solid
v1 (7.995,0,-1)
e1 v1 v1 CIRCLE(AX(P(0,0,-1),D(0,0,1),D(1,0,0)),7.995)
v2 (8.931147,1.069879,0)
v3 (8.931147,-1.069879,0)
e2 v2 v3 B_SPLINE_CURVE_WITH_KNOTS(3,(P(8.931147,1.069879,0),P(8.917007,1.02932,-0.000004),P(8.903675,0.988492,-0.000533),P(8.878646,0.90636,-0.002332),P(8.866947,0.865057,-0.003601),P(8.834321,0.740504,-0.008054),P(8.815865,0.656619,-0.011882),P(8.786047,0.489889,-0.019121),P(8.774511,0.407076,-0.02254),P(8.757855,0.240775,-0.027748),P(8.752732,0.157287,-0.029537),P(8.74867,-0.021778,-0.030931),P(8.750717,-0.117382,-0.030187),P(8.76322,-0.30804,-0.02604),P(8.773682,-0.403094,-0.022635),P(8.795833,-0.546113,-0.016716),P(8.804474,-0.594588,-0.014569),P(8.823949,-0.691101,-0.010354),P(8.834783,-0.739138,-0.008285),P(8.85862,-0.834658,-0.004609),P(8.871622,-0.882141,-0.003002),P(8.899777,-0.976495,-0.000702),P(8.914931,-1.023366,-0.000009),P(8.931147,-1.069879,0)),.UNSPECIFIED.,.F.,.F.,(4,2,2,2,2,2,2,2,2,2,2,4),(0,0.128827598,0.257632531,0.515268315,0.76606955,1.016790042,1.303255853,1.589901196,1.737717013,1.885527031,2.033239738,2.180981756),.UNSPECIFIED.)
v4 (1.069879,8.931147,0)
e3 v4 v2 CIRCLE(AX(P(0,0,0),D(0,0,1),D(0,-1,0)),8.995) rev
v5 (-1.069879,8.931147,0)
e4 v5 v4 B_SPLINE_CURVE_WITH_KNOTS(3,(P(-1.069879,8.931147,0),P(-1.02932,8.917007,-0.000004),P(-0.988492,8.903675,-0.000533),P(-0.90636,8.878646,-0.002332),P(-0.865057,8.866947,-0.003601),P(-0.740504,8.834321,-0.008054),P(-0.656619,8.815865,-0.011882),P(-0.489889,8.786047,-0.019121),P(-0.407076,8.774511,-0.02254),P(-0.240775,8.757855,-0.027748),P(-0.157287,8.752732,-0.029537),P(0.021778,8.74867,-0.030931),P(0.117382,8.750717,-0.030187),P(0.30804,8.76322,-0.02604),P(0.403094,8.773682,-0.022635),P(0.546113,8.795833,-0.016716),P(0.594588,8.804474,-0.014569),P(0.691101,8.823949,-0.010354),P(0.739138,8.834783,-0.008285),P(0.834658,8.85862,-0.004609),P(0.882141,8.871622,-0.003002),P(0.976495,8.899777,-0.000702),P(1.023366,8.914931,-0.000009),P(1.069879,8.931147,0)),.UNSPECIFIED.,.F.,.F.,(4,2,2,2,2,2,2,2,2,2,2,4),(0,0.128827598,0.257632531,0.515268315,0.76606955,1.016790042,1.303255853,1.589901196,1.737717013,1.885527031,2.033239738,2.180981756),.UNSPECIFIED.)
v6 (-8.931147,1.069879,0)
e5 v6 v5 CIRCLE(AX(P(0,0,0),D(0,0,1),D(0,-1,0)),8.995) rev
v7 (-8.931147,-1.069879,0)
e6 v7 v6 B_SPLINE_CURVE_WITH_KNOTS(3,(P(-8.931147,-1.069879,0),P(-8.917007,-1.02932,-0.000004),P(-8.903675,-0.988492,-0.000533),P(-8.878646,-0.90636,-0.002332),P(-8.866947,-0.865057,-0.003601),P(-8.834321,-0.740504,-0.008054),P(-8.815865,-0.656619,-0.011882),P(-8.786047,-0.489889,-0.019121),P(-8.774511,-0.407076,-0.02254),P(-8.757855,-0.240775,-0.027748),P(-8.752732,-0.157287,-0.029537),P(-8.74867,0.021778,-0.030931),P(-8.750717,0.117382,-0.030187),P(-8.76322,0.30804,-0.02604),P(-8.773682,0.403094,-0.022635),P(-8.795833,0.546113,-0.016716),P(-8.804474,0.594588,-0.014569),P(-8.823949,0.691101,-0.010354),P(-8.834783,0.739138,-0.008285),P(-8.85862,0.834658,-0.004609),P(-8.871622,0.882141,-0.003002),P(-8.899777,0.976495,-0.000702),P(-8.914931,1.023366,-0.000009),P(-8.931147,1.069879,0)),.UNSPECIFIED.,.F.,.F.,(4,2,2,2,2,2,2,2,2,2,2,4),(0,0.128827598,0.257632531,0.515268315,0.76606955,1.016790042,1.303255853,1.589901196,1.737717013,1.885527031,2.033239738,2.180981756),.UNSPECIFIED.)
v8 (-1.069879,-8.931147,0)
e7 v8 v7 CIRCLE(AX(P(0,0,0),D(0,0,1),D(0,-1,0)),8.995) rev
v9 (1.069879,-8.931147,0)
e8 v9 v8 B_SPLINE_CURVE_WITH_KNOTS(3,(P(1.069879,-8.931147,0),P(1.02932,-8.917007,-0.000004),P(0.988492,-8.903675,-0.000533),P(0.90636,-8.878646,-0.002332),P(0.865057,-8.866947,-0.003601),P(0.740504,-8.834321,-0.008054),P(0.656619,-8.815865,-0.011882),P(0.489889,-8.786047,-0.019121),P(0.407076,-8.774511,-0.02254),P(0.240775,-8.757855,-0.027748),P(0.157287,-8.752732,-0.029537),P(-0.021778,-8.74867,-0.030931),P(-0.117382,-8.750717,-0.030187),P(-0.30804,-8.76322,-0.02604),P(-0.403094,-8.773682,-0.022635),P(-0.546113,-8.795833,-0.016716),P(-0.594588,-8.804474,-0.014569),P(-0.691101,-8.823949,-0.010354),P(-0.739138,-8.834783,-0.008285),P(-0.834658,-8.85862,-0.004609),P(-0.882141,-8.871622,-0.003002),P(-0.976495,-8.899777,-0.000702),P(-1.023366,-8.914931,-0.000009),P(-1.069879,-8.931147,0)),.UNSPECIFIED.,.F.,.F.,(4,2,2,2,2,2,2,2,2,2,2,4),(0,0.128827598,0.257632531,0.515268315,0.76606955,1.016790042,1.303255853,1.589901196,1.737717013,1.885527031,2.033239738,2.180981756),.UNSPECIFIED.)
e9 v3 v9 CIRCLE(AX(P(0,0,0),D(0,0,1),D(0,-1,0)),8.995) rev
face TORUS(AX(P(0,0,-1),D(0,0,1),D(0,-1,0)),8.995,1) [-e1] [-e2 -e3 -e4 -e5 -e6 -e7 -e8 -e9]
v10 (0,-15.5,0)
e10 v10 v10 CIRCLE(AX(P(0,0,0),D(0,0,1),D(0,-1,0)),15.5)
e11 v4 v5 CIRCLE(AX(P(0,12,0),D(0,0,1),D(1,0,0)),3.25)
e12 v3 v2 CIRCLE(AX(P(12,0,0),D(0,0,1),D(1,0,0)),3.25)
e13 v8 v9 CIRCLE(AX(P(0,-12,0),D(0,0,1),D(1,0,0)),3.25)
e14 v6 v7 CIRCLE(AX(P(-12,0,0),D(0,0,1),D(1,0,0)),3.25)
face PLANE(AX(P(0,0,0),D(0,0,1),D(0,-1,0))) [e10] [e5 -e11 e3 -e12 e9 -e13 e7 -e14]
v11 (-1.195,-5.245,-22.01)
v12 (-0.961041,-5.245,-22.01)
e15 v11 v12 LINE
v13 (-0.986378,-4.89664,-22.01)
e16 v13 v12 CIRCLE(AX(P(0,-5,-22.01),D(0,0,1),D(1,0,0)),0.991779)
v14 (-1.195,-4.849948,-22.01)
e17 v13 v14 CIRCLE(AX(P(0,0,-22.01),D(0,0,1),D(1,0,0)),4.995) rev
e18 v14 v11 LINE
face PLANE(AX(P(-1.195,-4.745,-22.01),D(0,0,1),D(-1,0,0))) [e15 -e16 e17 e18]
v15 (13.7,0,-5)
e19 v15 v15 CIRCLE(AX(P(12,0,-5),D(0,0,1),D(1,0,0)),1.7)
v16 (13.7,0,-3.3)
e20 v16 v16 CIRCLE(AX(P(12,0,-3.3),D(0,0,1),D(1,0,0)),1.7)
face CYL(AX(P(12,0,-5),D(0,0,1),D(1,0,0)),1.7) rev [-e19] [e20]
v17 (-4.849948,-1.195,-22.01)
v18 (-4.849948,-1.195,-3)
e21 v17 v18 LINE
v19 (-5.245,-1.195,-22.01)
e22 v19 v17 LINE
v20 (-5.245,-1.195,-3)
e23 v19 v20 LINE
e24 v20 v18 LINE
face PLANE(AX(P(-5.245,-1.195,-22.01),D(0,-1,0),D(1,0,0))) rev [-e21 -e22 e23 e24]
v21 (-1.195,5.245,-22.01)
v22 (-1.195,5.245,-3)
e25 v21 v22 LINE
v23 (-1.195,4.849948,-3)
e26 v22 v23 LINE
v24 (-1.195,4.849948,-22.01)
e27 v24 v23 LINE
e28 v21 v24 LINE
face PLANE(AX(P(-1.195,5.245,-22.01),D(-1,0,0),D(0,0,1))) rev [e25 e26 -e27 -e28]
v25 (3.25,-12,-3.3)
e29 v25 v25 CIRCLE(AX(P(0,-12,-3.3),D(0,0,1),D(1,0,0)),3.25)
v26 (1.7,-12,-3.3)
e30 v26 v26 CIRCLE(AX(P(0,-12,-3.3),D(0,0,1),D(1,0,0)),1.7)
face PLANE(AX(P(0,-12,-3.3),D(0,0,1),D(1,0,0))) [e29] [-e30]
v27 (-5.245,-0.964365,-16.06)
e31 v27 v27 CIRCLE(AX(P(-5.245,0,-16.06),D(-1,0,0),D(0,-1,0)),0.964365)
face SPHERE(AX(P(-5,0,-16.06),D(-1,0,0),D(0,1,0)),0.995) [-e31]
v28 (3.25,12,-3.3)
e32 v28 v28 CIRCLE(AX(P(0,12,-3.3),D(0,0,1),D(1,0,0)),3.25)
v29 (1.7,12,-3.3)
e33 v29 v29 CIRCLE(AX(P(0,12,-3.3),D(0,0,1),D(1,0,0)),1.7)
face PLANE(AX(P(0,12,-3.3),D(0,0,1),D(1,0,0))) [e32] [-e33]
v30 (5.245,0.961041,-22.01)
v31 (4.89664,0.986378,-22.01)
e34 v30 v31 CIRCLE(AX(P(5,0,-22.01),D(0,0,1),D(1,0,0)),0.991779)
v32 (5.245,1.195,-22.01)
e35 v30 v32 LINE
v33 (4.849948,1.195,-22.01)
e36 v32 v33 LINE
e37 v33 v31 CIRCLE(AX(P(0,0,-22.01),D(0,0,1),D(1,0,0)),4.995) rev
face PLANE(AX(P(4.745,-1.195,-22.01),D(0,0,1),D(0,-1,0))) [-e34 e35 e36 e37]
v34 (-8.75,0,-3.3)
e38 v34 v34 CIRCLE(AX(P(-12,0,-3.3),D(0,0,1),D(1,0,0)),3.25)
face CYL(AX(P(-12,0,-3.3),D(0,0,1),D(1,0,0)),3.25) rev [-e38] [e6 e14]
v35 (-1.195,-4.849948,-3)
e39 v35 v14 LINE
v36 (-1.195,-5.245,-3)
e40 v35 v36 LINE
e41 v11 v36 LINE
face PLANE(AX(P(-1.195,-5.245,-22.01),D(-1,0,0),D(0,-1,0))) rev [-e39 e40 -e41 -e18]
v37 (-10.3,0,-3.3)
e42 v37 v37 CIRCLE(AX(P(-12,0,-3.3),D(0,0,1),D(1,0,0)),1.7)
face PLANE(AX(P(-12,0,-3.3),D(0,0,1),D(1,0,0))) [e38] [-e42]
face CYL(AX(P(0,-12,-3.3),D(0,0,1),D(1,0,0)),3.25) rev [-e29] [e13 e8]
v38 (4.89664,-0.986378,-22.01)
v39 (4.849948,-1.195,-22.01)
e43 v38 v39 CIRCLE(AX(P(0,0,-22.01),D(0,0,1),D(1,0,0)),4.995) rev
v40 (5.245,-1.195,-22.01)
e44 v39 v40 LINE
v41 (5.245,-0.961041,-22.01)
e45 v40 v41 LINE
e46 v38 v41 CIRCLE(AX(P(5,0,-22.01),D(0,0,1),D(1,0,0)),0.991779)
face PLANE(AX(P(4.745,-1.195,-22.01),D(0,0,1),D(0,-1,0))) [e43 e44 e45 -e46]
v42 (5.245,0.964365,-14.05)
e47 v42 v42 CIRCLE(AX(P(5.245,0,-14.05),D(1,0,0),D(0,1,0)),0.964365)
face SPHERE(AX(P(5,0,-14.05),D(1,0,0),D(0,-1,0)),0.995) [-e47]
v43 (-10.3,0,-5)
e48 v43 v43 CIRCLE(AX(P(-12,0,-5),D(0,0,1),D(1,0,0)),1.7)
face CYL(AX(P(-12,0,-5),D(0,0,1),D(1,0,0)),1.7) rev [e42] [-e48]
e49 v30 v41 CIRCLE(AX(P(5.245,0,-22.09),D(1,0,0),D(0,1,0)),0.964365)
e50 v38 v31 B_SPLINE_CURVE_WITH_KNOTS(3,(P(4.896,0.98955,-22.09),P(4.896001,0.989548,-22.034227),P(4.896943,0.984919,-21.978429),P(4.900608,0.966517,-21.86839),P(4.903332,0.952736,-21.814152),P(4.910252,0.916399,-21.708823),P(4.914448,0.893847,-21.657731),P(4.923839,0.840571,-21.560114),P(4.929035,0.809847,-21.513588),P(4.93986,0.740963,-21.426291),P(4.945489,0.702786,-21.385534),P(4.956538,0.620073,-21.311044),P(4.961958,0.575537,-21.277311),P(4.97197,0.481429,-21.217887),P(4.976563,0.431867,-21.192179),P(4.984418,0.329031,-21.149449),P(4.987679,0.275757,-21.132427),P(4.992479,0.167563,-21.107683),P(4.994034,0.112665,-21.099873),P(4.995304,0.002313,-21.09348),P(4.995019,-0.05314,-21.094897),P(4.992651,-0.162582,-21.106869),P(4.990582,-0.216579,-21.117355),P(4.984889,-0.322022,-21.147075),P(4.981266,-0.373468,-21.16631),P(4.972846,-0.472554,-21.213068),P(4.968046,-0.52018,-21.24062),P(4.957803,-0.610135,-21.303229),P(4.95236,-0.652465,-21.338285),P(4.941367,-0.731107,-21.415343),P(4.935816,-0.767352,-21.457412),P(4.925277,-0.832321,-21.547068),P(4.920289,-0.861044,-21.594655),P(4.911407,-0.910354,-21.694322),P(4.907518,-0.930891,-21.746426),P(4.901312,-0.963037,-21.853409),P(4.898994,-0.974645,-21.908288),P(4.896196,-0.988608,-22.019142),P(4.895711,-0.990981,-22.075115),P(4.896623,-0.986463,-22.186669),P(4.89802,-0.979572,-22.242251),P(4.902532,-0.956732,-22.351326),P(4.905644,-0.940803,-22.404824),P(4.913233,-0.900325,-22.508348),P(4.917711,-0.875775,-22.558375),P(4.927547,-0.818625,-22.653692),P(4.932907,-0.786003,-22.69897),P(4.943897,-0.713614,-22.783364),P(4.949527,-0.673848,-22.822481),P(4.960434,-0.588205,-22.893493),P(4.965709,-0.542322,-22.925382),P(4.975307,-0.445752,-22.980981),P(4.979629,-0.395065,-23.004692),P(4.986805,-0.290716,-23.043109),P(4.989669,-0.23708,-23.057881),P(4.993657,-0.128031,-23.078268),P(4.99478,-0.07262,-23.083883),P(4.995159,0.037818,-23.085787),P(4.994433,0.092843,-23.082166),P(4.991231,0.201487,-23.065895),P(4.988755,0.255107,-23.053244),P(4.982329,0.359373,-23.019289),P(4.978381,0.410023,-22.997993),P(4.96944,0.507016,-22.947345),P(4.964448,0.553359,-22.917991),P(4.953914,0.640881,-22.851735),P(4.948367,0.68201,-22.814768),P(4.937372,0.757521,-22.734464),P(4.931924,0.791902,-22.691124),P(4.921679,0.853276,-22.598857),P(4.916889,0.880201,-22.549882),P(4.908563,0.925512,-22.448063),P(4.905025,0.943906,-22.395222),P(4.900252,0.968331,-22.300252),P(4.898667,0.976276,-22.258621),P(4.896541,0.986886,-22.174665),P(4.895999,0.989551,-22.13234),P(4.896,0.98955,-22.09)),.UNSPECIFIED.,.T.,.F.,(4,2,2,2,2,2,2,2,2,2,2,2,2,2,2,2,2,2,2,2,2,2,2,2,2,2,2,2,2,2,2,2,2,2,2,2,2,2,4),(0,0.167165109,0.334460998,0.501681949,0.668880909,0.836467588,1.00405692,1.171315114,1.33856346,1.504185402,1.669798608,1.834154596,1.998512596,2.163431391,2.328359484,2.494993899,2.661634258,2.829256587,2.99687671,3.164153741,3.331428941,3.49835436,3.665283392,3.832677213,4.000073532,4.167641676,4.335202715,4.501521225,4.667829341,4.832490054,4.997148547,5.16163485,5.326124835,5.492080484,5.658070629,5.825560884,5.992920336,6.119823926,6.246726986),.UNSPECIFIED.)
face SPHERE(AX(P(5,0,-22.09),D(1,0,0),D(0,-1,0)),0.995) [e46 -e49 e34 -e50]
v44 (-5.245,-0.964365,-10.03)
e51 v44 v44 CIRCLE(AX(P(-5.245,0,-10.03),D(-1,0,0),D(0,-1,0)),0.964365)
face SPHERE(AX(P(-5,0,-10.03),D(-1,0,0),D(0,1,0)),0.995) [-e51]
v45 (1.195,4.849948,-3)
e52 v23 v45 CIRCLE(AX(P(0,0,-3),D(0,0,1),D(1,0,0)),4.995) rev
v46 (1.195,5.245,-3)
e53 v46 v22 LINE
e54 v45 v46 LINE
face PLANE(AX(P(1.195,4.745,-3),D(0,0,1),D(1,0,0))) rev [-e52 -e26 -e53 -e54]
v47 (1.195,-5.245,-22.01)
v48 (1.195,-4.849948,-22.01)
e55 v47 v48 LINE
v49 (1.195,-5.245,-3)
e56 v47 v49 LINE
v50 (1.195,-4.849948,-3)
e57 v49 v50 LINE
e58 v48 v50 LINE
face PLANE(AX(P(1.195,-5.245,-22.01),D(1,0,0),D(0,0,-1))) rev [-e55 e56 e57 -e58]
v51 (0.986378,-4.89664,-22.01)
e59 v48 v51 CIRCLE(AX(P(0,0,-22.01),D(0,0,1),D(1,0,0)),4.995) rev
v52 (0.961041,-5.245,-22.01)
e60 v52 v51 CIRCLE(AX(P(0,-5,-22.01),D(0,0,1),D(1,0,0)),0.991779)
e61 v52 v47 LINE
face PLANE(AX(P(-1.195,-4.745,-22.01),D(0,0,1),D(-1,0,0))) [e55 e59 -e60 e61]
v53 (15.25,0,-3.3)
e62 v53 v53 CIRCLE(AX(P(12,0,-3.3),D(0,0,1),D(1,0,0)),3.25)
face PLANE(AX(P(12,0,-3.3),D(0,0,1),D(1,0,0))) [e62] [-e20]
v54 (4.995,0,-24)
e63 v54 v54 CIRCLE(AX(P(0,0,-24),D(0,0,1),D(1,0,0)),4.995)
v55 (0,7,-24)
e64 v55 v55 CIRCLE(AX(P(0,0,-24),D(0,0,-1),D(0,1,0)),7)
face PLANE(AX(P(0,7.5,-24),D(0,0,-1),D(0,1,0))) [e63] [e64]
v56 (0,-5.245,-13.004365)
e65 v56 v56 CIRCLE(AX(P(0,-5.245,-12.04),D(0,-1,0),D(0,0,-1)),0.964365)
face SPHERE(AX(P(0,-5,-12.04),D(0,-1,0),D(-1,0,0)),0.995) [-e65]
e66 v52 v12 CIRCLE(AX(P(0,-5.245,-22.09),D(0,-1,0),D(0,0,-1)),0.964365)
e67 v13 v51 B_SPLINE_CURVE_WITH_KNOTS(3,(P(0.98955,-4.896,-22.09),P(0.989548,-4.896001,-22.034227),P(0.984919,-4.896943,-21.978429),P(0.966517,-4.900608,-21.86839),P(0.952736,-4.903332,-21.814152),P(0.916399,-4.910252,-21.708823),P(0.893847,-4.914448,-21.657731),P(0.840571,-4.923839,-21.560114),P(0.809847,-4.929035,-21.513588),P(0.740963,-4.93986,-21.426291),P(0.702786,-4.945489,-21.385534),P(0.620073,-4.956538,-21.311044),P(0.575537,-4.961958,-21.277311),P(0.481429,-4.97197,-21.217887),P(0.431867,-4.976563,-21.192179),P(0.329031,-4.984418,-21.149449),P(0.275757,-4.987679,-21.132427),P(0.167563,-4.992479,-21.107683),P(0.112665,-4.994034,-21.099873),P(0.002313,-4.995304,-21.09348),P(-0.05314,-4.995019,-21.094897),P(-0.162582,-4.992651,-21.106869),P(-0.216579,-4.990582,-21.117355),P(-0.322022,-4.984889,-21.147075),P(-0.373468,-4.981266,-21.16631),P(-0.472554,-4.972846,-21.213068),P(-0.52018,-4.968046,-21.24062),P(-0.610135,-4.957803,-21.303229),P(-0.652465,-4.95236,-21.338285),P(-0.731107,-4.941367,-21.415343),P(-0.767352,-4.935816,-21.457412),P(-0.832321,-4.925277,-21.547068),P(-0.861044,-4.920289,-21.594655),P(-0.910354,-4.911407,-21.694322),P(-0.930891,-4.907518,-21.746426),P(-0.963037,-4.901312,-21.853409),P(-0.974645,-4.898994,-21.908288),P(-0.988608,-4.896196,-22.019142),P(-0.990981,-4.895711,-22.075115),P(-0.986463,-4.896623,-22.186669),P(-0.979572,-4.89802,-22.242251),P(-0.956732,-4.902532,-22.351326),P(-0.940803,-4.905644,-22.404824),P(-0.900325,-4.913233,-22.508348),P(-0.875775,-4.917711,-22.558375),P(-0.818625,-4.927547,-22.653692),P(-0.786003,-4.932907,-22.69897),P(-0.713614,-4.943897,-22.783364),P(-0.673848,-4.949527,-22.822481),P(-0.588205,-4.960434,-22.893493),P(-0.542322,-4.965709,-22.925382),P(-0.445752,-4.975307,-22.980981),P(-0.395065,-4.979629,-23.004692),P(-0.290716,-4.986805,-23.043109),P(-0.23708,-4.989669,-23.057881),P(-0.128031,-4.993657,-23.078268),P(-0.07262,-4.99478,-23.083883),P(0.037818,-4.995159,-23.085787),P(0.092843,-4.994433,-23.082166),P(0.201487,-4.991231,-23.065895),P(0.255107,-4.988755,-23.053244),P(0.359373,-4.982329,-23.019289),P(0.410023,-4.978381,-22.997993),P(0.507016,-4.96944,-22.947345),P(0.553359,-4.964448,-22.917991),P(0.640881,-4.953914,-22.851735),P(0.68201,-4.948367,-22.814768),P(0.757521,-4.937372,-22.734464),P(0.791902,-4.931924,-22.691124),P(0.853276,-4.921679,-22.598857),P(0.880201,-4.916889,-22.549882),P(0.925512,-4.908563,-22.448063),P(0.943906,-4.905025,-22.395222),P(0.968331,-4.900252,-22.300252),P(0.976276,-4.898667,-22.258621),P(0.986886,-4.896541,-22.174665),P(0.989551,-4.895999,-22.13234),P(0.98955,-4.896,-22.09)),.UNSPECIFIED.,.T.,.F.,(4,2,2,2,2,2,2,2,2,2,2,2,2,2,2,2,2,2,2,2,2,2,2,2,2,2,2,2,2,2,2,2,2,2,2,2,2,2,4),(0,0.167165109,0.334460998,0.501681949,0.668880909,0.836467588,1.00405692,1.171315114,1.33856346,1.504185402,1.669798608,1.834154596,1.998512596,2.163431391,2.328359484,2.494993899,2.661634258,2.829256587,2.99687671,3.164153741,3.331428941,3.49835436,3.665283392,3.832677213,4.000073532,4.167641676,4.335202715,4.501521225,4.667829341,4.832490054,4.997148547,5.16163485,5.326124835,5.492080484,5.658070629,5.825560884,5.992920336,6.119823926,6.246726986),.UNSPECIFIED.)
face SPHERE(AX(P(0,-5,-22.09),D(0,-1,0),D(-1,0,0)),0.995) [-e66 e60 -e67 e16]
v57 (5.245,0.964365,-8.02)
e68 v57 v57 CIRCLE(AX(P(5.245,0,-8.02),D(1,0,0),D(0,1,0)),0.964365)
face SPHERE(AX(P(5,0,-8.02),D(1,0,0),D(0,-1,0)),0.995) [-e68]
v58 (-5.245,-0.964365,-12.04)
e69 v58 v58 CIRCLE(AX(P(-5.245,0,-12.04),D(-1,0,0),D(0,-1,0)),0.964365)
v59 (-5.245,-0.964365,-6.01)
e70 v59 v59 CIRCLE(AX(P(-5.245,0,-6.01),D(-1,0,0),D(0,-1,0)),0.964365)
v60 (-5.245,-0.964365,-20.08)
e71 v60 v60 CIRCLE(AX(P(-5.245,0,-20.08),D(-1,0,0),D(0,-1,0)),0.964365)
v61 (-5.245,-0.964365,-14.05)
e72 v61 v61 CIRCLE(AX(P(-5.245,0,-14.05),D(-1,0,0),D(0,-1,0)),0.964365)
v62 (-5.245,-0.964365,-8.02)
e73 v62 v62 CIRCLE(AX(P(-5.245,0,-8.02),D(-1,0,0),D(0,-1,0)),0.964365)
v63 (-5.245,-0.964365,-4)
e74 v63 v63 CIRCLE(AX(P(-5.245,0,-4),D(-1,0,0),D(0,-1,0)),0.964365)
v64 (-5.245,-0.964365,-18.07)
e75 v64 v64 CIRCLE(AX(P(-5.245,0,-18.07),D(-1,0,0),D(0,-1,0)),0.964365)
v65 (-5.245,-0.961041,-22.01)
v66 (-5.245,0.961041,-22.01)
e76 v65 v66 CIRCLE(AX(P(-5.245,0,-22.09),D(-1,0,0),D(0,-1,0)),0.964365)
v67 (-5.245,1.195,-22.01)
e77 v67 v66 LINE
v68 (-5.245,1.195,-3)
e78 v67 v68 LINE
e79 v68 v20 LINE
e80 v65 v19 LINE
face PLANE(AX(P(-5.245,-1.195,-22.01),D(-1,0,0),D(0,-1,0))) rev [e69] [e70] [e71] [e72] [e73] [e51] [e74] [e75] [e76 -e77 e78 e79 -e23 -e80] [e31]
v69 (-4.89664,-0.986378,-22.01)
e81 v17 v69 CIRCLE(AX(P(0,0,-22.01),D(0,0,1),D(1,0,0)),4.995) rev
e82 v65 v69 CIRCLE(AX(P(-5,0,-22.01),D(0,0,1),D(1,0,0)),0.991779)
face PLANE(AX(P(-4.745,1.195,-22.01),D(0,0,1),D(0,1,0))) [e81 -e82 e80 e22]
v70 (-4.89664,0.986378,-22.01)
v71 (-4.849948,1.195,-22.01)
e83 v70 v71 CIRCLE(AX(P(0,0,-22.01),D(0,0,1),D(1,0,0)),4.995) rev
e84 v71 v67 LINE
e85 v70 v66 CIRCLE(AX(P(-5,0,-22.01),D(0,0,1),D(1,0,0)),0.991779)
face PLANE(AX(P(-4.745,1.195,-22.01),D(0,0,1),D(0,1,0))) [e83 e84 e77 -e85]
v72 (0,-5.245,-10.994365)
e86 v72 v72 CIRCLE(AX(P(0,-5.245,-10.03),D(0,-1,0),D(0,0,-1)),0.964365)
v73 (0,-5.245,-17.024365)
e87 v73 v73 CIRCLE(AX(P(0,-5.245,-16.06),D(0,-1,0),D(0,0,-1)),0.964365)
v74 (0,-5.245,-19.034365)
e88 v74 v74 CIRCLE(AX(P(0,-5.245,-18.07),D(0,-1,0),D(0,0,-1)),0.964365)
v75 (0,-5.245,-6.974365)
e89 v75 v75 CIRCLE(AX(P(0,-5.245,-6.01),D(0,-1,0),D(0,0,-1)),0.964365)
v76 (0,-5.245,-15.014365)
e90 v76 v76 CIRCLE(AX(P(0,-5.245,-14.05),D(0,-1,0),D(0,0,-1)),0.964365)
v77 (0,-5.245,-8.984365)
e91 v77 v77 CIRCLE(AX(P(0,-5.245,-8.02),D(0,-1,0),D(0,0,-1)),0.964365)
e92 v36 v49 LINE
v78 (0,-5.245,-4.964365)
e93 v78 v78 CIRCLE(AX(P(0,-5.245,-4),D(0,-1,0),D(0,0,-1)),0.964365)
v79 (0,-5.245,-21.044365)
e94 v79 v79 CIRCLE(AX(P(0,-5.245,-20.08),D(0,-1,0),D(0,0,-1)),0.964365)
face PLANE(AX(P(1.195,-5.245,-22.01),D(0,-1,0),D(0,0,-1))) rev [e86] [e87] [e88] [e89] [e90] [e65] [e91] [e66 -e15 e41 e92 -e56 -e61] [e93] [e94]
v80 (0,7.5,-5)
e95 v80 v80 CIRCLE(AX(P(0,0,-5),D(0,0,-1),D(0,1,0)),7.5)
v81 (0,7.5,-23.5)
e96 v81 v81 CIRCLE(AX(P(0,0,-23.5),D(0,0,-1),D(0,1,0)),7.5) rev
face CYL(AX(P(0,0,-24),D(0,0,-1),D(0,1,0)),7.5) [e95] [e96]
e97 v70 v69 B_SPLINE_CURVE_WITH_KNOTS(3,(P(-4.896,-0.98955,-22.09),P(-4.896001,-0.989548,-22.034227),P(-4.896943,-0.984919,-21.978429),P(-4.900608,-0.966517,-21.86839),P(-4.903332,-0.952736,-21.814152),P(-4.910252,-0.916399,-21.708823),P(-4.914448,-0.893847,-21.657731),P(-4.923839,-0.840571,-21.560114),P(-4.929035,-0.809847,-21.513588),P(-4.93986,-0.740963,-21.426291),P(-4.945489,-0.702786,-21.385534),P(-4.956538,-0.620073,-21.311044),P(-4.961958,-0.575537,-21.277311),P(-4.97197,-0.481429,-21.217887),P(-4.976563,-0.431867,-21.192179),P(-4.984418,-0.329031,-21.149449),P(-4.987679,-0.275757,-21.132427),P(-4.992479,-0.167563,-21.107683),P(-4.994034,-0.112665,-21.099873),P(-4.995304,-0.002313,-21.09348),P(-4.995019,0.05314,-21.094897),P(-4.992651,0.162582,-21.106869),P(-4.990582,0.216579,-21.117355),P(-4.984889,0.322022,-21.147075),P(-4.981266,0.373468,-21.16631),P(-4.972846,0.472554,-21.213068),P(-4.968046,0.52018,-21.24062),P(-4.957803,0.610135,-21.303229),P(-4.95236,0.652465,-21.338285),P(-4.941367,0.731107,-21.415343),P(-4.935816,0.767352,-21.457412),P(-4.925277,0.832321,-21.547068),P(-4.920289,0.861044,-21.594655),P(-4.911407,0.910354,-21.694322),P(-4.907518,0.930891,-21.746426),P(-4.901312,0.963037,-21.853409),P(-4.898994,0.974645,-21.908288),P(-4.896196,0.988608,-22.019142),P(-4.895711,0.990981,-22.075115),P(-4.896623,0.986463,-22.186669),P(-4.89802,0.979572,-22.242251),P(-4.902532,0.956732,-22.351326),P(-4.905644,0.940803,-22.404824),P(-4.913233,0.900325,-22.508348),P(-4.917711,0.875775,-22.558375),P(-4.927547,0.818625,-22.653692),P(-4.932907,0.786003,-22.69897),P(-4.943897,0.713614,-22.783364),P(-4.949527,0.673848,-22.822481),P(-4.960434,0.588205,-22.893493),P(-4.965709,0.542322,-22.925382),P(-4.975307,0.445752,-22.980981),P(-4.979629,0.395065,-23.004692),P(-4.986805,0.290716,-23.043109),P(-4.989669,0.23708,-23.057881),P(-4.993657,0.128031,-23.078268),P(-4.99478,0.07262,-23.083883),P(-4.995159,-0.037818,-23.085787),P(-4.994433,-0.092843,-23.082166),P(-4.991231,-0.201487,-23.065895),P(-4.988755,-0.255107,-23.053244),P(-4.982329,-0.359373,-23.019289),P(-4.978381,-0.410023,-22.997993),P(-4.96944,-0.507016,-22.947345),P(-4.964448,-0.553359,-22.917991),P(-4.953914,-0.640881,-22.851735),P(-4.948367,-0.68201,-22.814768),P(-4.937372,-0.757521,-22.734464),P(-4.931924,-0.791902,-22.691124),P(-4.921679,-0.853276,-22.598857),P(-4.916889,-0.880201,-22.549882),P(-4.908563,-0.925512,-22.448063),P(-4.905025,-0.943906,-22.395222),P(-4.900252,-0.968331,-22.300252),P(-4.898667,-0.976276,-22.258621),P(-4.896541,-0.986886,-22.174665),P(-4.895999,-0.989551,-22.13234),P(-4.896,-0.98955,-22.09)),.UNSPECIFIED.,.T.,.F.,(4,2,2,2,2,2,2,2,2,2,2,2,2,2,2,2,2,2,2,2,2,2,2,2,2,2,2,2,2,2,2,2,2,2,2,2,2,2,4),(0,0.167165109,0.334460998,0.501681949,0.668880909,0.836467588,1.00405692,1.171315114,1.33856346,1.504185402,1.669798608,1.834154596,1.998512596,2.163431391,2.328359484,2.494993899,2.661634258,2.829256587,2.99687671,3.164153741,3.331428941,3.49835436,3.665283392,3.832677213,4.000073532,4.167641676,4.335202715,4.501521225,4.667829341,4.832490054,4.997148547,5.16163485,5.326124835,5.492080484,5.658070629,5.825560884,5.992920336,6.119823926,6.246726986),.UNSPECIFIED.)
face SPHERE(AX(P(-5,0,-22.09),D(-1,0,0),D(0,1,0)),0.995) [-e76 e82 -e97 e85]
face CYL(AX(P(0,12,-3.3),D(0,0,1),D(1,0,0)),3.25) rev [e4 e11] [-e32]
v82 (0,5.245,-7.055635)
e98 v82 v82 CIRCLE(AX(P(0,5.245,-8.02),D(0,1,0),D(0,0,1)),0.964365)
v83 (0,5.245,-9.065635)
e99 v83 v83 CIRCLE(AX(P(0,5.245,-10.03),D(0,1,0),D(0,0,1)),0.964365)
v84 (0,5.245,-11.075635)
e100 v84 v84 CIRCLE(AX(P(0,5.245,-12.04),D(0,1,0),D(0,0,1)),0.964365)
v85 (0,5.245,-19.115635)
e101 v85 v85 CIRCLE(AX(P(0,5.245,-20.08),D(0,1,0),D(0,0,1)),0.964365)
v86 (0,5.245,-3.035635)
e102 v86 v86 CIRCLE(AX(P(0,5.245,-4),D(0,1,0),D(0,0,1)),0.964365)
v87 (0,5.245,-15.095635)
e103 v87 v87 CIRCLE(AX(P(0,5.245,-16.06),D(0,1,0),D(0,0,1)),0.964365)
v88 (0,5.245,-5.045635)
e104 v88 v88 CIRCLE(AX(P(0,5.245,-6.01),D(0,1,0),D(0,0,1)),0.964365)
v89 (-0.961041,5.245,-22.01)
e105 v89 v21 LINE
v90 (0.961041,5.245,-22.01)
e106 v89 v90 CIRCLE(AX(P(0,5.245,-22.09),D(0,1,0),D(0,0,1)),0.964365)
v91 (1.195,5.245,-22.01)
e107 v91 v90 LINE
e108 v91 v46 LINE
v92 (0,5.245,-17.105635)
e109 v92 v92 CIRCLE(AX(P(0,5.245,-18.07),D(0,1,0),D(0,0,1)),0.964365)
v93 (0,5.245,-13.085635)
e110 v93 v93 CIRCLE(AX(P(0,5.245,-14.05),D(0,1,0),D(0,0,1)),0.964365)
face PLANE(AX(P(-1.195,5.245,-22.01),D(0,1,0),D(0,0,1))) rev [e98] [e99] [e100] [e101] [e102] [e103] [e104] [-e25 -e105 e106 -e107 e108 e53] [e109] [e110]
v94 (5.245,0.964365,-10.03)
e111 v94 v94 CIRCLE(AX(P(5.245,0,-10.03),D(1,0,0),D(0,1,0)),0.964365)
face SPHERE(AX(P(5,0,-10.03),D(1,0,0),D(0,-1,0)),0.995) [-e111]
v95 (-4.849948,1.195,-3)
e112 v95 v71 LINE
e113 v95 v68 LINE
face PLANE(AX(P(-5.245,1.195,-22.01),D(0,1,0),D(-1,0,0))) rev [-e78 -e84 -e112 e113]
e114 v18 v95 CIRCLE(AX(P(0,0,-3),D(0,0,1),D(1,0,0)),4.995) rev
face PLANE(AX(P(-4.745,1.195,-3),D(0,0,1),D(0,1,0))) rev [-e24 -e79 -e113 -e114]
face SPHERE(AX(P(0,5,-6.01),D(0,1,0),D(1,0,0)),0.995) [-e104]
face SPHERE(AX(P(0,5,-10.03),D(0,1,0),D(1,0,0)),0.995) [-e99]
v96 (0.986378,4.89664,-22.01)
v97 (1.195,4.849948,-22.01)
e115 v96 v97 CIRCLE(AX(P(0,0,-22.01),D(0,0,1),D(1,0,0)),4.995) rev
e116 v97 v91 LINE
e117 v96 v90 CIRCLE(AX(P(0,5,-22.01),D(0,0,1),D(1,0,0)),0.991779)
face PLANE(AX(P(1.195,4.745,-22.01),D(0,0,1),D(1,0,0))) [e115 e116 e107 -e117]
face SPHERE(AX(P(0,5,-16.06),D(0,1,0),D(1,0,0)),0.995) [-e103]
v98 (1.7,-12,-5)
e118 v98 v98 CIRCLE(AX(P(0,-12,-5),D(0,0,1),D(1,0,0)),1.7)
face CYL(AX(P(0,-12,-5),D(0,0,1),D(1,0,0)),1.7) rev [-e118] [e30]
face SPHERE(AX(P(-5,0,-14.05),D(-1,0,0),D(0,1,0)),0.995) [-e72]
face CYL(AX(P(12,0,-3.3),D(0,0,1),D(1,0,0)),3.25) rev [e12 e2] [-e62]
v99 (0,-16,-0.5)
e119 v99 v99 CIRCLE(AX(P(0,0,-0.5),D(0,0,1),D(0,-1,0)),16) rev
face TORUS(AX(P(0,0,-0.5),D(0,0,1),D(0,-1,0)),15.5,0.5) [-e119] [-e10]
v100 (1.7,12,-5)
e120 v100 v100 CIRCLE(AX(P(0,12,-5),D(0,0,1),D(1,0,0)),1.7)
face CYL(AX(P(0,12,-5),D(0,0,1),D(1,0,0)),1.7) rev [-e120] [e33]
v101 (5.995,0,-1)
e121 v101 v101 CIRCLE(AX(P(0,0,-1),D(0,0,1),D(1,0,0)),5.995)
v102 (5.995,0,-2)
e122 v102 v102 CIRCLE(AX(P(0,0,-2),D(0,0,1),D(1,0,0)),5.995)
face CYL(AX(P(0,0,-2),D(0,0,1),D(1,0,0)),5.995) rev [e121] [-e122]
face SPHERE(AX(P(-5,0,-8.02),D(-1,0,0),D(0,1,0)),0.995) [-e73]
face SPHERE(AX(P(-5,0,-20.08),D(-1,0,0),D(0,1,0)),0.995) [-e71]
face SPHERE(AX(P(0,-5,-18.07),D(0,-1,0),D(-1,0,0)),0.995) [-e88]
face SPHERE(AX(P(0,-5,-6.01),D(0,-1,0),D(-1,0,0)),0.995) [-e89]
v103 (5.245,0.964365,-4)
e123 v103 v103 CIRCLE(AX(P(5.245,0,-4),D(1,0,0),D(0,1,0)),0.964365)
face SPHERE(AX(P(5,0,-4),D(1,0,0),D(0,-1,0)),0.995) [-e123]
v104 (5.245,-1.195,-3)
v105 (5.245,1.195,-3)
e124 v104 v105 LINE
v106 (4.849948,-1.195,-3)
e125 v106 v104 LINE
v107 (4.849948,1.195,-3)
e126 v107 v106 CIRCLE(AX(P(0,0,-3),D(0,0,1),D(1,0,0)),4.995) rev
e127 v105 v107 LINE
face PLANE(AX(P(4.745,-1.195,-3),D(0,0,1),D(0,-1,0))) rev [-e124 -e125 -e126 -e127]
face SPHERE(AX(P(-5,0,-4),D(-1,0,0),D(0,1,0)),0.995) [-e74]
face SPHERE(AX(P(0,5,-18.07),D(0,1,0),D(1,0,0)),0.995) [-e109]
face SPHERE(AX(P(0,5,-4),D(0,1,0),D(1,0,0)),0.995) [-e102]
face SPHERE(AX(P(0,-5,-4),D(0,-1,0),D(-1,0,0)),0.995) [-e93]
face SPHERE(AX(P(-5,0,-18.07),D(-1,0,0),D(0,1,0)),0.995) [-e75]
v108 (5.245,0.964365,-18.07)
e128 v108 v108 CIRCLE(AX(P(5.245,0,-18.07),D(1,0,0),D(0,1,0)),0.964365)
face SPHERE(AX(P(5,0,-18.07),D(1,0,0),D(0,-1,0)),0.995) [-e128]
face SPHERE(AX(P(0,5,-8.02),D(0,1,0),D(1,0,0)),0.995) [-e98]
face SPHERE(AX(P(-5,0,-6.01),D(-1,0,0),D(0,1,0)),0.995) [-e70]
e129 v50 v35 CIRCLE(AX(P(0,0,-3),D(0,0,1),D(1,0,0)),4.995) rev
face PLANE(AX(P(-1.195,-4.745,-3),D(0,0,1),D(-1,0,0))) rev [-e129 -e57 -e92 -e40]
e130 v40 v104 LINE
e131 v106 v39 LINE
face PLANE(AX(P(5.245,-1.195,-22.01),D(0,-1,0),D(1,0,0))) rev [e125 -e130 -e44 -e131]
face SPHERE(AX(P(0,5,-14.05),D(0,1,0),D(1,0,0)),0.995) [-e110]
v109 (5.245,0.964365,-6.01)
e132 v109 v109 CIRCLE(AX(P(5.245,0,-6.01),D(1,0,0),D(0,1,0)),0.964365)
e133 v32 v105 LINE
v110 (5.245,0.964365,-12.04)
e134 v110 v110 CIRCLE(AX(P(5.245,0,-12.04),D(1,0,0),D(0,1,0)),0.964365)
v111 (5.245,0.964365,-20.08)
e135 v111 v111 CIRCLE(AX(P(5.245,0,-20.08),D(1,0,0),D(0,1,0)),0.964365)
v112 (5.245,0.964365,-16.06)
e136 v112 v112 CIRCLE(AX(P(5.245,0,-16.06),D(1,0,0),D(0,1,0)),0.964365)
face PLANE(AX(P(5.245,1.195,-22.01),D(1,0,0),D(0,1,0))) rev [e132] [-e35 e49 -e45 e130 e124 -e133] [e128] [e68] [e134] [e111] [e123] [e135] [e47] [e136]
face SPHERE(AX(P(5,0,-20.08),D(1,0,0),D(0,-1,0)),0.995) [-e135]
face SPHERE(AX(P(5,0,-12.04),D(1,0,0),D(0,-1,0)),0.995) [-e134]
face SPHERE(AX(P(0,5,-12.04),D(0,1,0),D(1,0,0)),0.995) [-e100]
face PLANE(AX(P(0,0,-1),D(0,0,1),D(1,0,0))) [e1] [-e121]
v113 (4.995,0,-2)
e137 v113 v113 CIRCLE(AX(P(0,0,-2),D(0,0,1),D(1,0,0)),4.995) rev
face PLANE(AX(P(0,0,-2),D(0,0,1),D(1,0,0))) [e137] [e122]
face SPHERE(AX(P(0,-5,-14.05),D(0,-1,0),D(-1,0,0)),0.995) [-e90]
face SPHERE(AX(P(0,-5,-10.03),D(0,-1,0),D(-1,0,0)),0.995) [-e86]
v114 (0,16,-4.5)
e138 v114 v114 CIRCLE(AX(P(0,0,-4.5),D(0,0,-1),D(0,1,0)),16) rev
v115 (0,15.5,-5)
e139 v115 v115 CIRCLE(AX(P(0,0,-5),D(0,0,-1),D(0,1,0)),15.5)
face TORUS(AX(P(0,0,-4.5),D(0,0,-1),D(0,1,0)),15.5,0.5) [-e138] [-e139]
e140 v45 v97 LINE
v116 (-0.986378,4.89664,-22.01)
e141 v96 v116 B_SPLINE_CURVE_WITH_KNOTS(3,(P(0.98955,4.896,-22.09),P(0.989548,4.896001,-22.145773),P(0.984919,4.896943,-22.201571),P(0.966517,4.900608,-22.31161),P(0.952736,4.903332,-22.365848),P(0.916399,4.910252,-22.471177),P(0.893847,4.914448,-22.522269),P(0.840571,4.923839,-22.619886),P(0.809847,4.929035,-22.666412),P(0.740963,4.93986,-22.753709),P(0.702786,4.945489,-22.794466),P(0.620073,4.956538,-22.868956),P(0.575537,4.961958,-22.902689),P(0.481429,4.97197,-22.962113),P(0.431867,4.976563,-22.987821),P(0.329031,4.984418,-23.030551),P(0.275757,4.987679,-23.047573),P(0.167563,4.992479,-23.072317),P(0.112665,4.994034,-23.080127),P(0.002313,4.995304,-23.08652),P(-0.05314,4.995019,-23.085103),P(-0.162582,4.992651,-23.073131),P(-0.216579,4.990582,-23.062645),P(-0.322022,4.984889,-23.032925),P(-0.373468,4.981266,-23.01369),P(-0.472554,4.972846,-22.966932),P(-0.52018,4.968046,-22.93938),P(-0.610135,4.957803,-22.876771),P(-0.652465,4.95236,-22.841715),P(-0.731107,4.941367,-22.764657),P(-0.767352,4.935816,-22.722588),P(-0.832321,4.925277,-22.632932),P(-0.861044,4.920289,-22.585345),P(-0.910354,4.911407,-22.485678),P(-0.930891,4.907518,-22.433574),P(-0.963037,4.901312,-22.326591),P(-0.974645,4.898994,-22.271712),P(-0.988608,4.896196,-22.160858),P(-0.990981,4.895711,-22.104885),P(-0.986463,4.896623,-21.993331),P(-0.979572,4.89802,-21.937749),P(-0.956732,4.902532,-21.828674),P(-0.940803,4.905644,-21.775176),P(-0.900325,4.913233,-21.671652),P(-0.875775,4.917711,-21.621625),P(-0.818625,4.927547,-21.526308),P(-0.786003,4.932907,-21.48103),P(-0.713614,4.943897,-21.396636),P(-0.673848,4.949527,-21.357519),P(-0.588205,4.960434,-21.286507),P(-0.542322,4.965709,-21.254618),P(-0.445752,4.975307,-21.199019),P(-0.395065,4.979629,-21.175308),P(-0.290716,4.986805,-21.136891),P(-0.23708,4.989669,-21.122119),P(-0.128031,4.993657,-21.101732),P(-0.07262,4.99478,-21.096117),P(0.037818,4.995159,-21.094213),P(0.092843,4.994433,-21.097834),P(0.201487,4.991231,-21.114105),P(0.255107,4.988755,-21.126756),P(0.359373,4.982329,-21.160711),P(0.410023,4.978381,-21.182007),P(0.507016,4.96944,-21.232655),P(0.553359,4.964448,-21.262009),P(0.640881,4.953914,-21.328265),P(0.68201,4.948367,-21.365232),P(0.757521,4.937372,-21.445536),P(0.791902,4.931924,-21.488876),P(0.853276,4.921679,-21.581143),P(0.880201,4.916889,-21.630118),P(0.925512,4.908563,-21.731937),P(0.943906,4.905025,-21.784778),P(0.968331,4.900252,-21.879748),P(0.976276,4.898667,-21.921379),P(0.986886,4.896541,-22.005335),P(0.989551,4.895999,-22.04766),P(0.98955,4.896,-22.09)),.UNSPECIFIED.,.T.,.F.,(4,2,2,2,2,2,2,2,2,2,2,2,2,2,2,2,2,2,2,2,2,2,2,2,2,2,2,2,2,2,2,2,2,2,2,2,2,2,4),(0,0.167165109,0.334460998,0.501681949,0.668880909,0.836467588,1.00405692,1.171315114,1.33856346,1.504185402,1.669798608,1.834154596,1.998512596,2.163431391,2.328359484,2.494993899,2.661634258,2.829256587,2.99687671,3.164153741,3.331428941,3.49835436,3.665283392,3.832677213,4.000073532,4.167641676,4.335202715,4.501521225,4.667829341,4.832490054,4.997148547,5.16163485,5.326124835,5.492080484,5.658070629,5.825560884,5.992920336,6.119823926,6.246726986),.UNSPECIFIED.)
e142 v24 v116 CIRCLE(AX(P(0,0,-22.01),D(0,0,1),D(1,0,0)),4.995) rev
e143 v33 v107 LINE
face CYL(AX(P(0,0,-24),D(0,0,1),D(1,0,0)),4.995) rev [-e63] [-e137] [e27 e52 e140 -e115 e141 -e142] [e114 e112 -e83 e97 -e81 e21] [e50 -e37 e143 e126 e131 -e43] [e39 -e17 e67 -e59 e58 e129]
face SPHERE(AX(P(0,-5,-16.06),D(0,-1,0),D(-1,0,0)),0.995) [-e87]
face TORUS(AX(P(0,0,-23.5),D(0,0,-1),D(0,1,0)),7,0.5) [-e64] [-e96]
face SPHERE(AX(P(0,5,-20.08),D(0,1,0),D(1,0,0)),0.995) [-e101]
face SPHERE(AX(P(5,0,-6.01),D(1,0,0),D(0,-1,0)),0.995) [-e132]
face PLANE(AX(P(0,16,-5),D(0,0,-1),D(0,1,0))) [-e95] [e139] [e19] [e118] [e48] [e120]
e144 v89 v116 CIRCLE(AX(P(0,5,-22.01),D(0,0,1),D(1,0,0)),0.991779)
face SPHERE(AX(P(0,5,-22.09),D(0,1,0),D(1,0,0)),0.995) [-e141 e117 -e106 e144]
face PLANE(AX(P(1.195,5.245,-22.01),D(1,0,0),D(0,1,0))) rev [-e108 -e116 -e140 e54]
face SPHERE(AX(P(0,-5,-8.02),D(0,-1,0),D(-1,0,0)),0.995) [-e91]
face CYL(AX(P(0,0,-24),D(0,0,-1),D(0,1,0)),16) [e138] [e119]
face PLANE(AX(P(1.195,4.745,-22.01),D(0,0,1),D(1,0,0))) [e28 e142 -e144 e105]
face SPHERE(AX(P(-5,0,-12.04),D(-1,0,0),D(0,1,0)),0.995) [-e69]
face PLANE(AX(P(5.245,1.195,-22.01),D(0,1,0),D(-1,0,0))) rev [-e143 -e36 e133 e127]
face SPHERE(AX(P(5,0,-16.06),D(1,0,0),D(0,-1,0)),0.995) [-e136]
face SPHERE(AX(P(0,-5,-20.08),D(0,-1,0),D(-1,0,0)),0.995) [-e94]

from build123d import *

# Parameters (mm, degrees)
REVOLVE_START            = -24
REVOLVE_1_OUTLINE_R      = 7.5
REVOLVE_1_DEPTH          = 24
REVOLVE_START_2          = -5
REVOLVE_1_2_OUTLINE_R    = 16
REVOLVE_1_2_OUTLINE_R_2  = 7.5
REVOLVE_1_2_DEPTH        = 5
SKETCH_16_R              = 3.25
CUT_EXTRUDE_11_DEPTH     = 3.3
SKETCH_17_R              = 1.7
CUT_EXTRUDE_12_DEPTH     = 5
SKETCH_4_R               = 4.995
CUT_EXTRUDE_1_DEPTH      = 24
SKETCH_5_R               = 7.995
CUT_EXTRUDE_2_DEPTH      = 1
SKETCH_6_R               = 5.995
CUT_EXTRUDE_3_DEPTH      = 1
FILLET_1_R               = 0.5
FILLET_2_R               = 1
SKETCH_8_W               = 2.39
SKETCH_8_H               = 0.5
CUT_EXTRUDE_4_DEPTH      = 19.01
PATTERN_LINEAR_2_COUNT   = 10
PATTERN_LINEAR_2_PITCH   = 2.01
PATTERN_CIRCULAR_2_COUNT = 4


# Read off the part's stored shape, not the designer's step: 旋转1, 旋转2
with BuildPart() as part:
    # 旋转1 outline → 旋转1 (new body)
    with BuildSketch(Plane.XY.offset(REVOLVE_START)):
        Circle(REVOLVE_1_OUTLINE_R)
    extrude(amount=REVOLVE_1_DEPTH)

    # Revolve 1 2 outline → Revolve 1 2 (add)
    with BuildSketch(Plane.XY.offset(REVOLVE_START_2)):
        Circle(REVOLVE_1_2_OUTLINE_R)
        Circle(REVOLVE_1_2_OUTLINE_R_2, mode=Mode.SUBTRACT)
    extrude(amount=REVOLVE_1_2_DEPTH)

    # 草图16 → 切除-拉伸11 (cut)
    with BuildSketch(Plane.XY):
        with Locations((0, 12)):
            Circle(SKETCH_16_R)
        with Locations((12, 0)):
            Circle(SKETCH_16_R)
        with Locations((-12, 0)):
            Circle(SKETCH_16_R)
        with Locations((0, -12)):
            Circle(SKETCH_16_R)
    extrude(amount=-CUT_EXTRUDE_11_DEPTH, mode=Mode.SUBTRACT)

    # 草图17 → 切除-拉伸12 (cut)
    with BuildSketch(Plane.XY):
        with Locations((12, 0)):
            Circle(SKETCH_17_R)
        with Locations((0, -12)):
            Circle(SKETCH_17_R)
        with Locations((-12, 0)):
            Circle(SKETCH_17_R)
        with Locations((0, 12)):
            Circle(SKETCH_17_R)
    extrude(amount=-CUT_EXTRUDE_12_DEPTH, mode=Mode.SUBTRACT)

    # 草图4 → 切除-拉伸1 (cut)
    with BuildSketch(Plane.XY):
        Circle(SKETCH_4_R)
    extrude(amount=-CUT_EXTRUDE_1_DEPTH, mode=Mode.SUBTRACT)

    # 草图5 → 切除-拉伸2 (cut)
    with BuildSketch(Plane.XY):
        Circle(SKETCH_5_R)
    extrude(amount=-CUT_EXTRUDE_2_DEPTH, mode=Mode.SUBTRACT)

    # 草图6 → 切除-拉伸3 (cut)
    with BuildSketch(Plane.XY.offset(-1)):
        Circle(SKETCH_6_R)
    extrude(amount=-CUT_EXTRUDE_3_DEPTH, mode=Mode.SUBTRACT)

    # 圆角1
    fillet_1_edges = [part.edges().sort_by_distance(p)[0] for p in [
        (-7.5, 0, -24),
        (-16, 0, -5),
        (-16, 0, 0),
    ]]
    fillet(fillet_1_edges, radius=FILLET_1_R)

    # 圆角2
    # the kernel refuses this fillet: 1 mm, written as the material it takes off along each edge
    with BuildSketch(Plane(origin=(0, 0, 0), x_dir=(1, 0, 0), z_dir=(0, -1, 0))) as fillet_2_piece_1:
        with BuildLine():
            CenterArc((7.995 + FILLET_2_R, -FILLET_2_R), FILLET_2_R, 90, 90)
            Line((7.995, -FILLET_2_R), (7.995, 0))
            Line((7.995, 0), (7.995 + FILLET_2_R, 0))
        make_face()
    revolve(axis=Axis((0, 0, 0), (0, 0, 1)), mode=Mode.SUBTRACT)

    # 草图8 → 切除-拉伸4 (cut)
    with BuildSketch(Plane.XY.offset(-3)):
        with Locations((0, 4.995)):
            Rectangle(SKETCH_8_W, SKETCH_8_H)
    cut_extrude_4 = extrude(amount=-CUT_EXTRUDE_4_DEPTH, mode=Mode.SUBTRACT)

    # 旋转2 outline → 旋转2 (revolve)
    with BuildSketch(Plane.XY.offset(-4)):
        with BuildLine():
            Line((0, 5.245000001), (0, 4.005))
            ThreePointArc((0, 4.005), (0.785429819, 4.389160414), (0.964365076, 5.245000001))
            Line((0.964365076, 5.245000001), (0, 5.245000001))
        make_face()
    revolve_2 = revolve(axis=Axis((0, 0, -4), (0, 1, 0)))

    # 阵列(线性)2: 旋转2 ×10
    with Locations(*[(0, 0, -i * PATTERN_LINEAR_2_PITCH) for i in range(1, PATTERN_LINEAR_2_COUNT)]):
        add(revolve_2)

    # 阵列(圆周)2: 切除-拉伸4, 旋转2 ×4 about axis
    pattern_circular_2_axis = Axis((0, 0, 0), (0, 0, 1))
    add([cut_extrude_4.rotate(pattern_circular_2_axis, i * 360 / PATTERN_CIRCULAR_2_COUNT) for i in range(1, PATTERN_CIRCULAR_2_COUNT)], mode=Mode.SUBTRACT)
    add([revolve_2.rotate(pattern_circular_2_axis, i * 360 / PATTERN_CIRCULAR_2_COUNT) for i in range(1, PATTERN_CIRCULAR_2_COUNT)])

    # 阵列(圆周)2 copy 1 sketch → 阵列(圆周)2 copy 1 (revolve)
    with BuildSketch(Plane(origin=(0, 0, -6.01), x_dir=(0, 1, 0), z_dir=(0, 0, 1))):
        with BuildLine():
            Line((0, 5.245000001), (0, 4.005))
            ThreePointArc((0, 4.005), (0.785429819, 4.389160414), (0.964365076, 5.245000001))
            Line((0.964365076, 5.245000001), (0, 5.245000001))
        make_face()
    revolve(axis=Axis((0, 0, -6.01), (-1, 0, 0)))

    # 阵列(圆周)2 copy 2 sketch → 阵列(圆周)2 copy 2 (revolve)
    with BuildSketch(Plane(origin=(0, 0, -6.01), x_dir=(-1, 0, 0), z_dir=(0, 0, 1))):
        with BuildLine():
            Line((0, 5.245000001), (0, 4.005))
            ThreePointArc((0, 4.005), (0.785429819, 4.389160414), (0.964365076, 5.245000001))
            Line((0.964365076, 5.245000001), (0, 5.245000001))
        make_face()
    revolve(axis=Axis((0, 0, -6.01), (0, -1, 0)))

    # 阵列(圆周)2 copy 3 sketch → 阵列(圆周)2 copy 3 (revolve)
    with BuildSketch(Plane(origin=(0, 0, -6.01), x_dir=(0, -1, 0), z_dir=(0, 0, 1))):
        with BuildLine():
            Line((0, 5.245000001), (0, 4.005))
            ThreePointArc((0, 4.005), (0.785429819, 4.389160414), (0.964365076, 5.245000001))
            Line((0.964365076, 5.245000001), (0, 5.245000001))
        make_face()
    revolve(axis=Axis((0, 0, -6.01), (1, 0, 0)))

    # 阵列(圆周)2 copy 4 sketch → 阵列(圆周)2 copy 4 (revolve)
    with BuildSketch(Plane(origin=(0, 0, -8.02), x_dir=(0, 1, 0), z_dir=(0, 0, 1))):
        with BuildLine():
            Line((0, 5.245000001), (0, 4.005))
            ThreePointArc((0, 4.005), (0.785429819, 4.389160414), (0.964365076, 5.245000001))
            Line((0.964365076, 5.245000001), (0, 5.245000001))
        make_face()
    revolve(axis=Axis((0, 0, -8.02), (-1, 0, 0)))

    # 阵列(圆周)2 copy 5 sketch → 阵列(圆周)2 copy 5 (revolve)
    with BuildSketch(Plane(origin=(0, 0, -8.02), x_dir=(-1, 0, 0), z_dir=(0, 0, 1))):
        with BuildLine():
            Line((0, 5.245000001), (0, 4.005))
            ThreePointArc((0, 4.005), (0.785429819, 4.389160414), (0.964365076, 5.245000001))
            Line((0.964365076, 5.245000001), (0, 5.245000001))
        make_face()
    revolve(axis=Axis((0, 0, -8.02), (0, -1, 0)))

    # 阵列(圆周)2 copy 6 sketch → 阵列(圆周)2 copy 6 (revolve)
    with BuildSketch(Plane(origin=(0, 0, -8.02), x_dir=(0, -1, 0), z_dir=(0, 0, 1))):
        with BuildLine():
            Line((0, 5.245000001), (0, 4.005))
            ThreePointArc((0, 4.005), (0.785429819, 4.389160414), (0.964365076, 5.245000001))
            Line((0.964365076, 5.245000001), (0, 5.245000001))
        make_face()
    revolve(axis=Axis((0, 0, -8.02), (1, 0, 0)))

    # 阵列(圆周)2 copy 7 sketch → 阵列(圆周)2 copy 7 (revolve)
    with BuildSketch(Plane(origin=(0, 0, -10.03), x_dir=(0, 1, 0), z_dir=(0, 0, 1))):
        with BuildLine():
            Line((0, 5.245000001), (0, 4.005))
            ThreePointArc((0, 4.005), (0.785429819, 4.389160414), (0.964365076, 5.245000001))
            Line((0.964365076, 5.245000001), (0, 5.245000001))
        make_face()
    revolve(axis=Axis((0, 0, -10.03), (-1, 0, 0)))

    # 阵列(圆周)2 copy 8 sketch → 阵列(圆周)2 copy 8 (revolve)
    with BuildSketch(Plane(origin=(0, 0, -10.03), x_dir=(-1, 0, 0), z_dir=(0, 0, 1))):
        with BuildLine():
            Line((0, 5.245000001), (0, 4.005))
            ThreePointArc((0, 4.005), (0.785429819, 4.389160414), (0.964365076, 5.245000001))
            Line((0.964365076, 5.245000001), (0, 5.245000001))
        make_face()
    revolve(axis=Axis((0, 0, -10.03), (0, -1, 0)))

    # 阵列(圆周)2 copy 9 sketch → 阵列(圆周)2 copy 9 (revolve)
    with BuildSketch(Plane(origin=(0, 0, -10.03), x_dir=(0, -1, 0), z_dir=(0, 0, 1))):
        with BuildLine():
            Line((0, 5.245000001), (0, 4.005))
            ThreePointArc((0, 4.005), (0.785429819, 4.389160414), (0.964365076, 5.245000001))
            Line((0.964365076, 5.245000001), (0, 5.245000001))
        make_face()
    revolve(axis=Axis((0, 0, -10.03), (1, 0, 0)))

    # 阵列(圆周)2 copy 10 sketch → 阵列(圆周)2 copy 10 (revolve)
    with BuildSketch(Plane(origin=(0, 0, -12.04), x_dir=(0, 1, 0), z_dir=(0, 0, 1))):
        with BuildLine():
            Line((0, 5.245000001), (0, 4.005))
            ThreePointArc((0, 4.005), (0.785429819, 4.389160414), (0.964365076, 5.245000001))
            Line((0.964365076, 5.245000001), (0, 5.245000001))
        make_face()
    revolve(axis=Axis((0, 0, -12.04), (-1, 0, 0)))

    # 阵列(圆周)2 copy 11 sketch → 阵列(圆周)2 copy 11 (revolve)
    with BuildSketch(Plane(origin=(0, 0, -12.04), x_dir=(-1, 0, 0), z_dir=(0, 0, 1))):
        with BuildLine():
            Line((0, 5.245000001), (0, 4.005))
            ThreePointArc((0, 4.005), (0.785429819, 4.389160414), (0.964365076, 5.245000001))
            Line((0.964365076, 5.245000001), (0, 5.245000001))
        make_face()
    revolve(axis=Axis((0, 0, -12.04), (0, -1, 0)))

    # 阵列(圆周)2 copy 12 sketch → 阵列(圆周)2 copy 12 (revolve)
    with BuildSketch(Plane(origin=(0, 0, -12.04), x_dir=(0, -1, 0), z_dir=(0, 0, 1))):
        with BuildLine():
            Line((0, 5.245000001), (0, 4.005))
            ThreePointArc((0, 4.005), (0.785429819, 4.389160414), (0.964365076, 5.245000001))
            Line((0.964365076, 5.245000001), (0, 5.245000001))
        make_face()
    revolve(axis=Axis((0, 0, -12.04), (1, 0, 0)))

    # 阵列(圆周)2 copy 13 sketch → 阵列(圆周)2 copy 13 (revolve)
    with BuildSketch(Plane(origin=(0, 0, -14.05), x_dir=(0, 1, 0), z_dir=(0, 0, 1))):
        with BuildLine():
            Line((0, 5.245000001), (0, 4.005))
            ThreePointArc((0, 4.005), (0.785429819, 4.389160414), (0.964365076, 5.245000001))
            Line((0.964365076, 5.245000001), (0, 5.245000001))
        make_face()
    revolve(axis=Axis((0, 0, -14.05), (-1, 0, 0)))

    # 阵列(圆周)2 copy 14 sketch → 阵列(圆周)2 copy 14 (revolve)
    with BuildSketch(Plane(origin=(0, 0, -14.05), x_dir=(-1, 0, 0), z_dir=(0, 0, 1))):
        with BuildLine():
            Line((0, 5.245000001), (0, 4.005))
            ThreePointArc((0, 4.005), (0.785429819, 4.389160414), (0.964365076, 5.245000001))
            Line((0.964365076, 5.245000001), (0, 5.245000001))
        make_face()
    revolve(axis=Axis((0, 0, -14.05), (0, -1, 0)))

    # 阵列(圆周)2 copy 15 sketch → 阵列(圆周)2 copy 15 (revolve)
    with BuildSketch(Plane(origin=(0, 0, -14.05), x_dir=(0, -1, 0), z_dir=(0, 0, 1))):
        with BuildLine():
            Line((0, 5.245000001), (0, 4.005))
            ThreePointArc((0, 4.005), (0.785429819, 4.389160414), (0.964365076, 5.245000001))
            Line((0.964365076, 5.245000001), (0, 5.245000001))
        make_face()
    revolve(axis=Axis((0, 0, -14.05), (1, 0, 0)))

    # 阵列(圆周)2 copy 16 sketch → 阵列(圆周)2 copy 16 (revolve)
    with BuildSketch(Plane(origin=(0, 0, -16.06), x_dir=(0, 1, 0), z_dir=(0, 0, 1))):
        with BuildLine():
            Line((0, 5.245000001), (0, 4.005))
            ThreePointArc((0, 4.005), (0.785429819, 4.389160414), (0.964365076, 5.245000001))
            Line((0.964365076, 5.245000001), (0, 5.245000001))
        make_face()
    revolve(axis=Axis((0, 0, -16.06), (-1, 0, 0)))

    # 阵列(圆周)2 copy 17 sketch → 阵列(圆周)2 copy 17 (revolve)
    with BuildSketch(Plane(origin=(0, 0, -16.06), x_dir=(-1, 0, 0), z_dir=(0, 0, 1))):
        with BuildLine():
            Line((0, 5.245000001), (0, 4.005))
            ThreePointArc((0, 4.005), (0.785429819, 4.389160414), (0.964365076, 5.245000001))
            Line((0.964365076, 5.245000001), (0, 5.245000001))
        make_face()
    revolve(axis=Axis((0, 0, -16.06), (0, -1, 0)))

    # 阵列(圆周)2 copy 18 sketch → 阵列(圆周)2 copy 18 (revolve)
    with BuildSketch(Plane(origin=(0, 0, -16.06), x_dir=(0, -1, 0), z_dir=(0, 0, 1))):
        with BuildLine():
            Line((0, 5.245000001), (0, 4.005))
            ThreePointArc((0, 4.005), (0.785429819, 4.389160414), (0.964365076, 5.245000001))
            Line((0.964365076, 5.245000001), (0, 5.245000001))
        make_face()
    revolve(axis=Axis((0, 0, -16.06), (1, 0, 0)))

    # 阵列(圆周)2 copy 19 sketch → 阵列(圆周)2 copy 19 (revolve)
    with BuildSketch(Plane(origin=(0, 0, -18.07), x_dir=(0, 1, 0), z_dir=(0, 0, 1))):
        with BuildLine():
            Line((0, 5.245000001), (0, 4.005))
            ThreePointArc((0, 4.005), (0.785429819, 4.389160414), (0.964365076, 5.245000001))
            Line((0.964365076, 5.245000001), (0, 5.245000001))
        make_face()
    revolve(axis=Axis((0, 0, -18.07), (-1, 0, 0)))

    # 阵列(圆周)2 copy 20 sketch → 阵列(圆周)2 copy 20 (revolve)
    with BuildSketch(Plane(origin=(0, 0, -18.07), x_dir=(-1, 0, 0), z_dir=(0, 0, 1))):
        with BuildLine():
            Line((0, 5.245000001), (0, 4.005))
            ThreePointArc((0, 4.005), (0.785429819, 4.389160414), (0.964365076, 5.245000001))
            Line((0.964365076, 5.245000001), (0, 5.245000001))
        make_face()
    revolve(axis=Axis((0, 0, -18.07), (0, -1, 0)))

    # 阵列(圆周)2 copy 21 sketch → 阵列(圆周)2 copy 21 (revolve)
    with BuildSketch(Plane(origin=(0, 0, -18.07), x_dir=(0, -1, 0), z_dir=(0, 0, 1))):
        with BuildLine():
            Line((0, 5.245000001), (0, 4.005))
            ThreePointArc((0, 4.005), (0.785429819, 4.389160414), (0.964365076, 5.245000001))
            Line((0.964365076, 5.245000001), (0, 5.245000001))
        make_face()
    revolve(axis=Axis((0, 0, -18.07), (1, 0, 0)))

    # 阵列(圆周)2 copy 22 sketch → 阵列(圆周)2 copy 22 (revolve)
    with BuildSketch(Plane(origin=(0, 0, -20.08), x_dir=(0, 1, 0), z_dir=(0, 0, 1))):
        with BuildLine():
            Line((0, 5.245000001), (0, 4.005))
            ThreePointArc((0, 4.005), (0.785429819, 4.389160414), (0.964365076, 5.245000001))
            Line((0.964365076, 5.245000001), (0, 5.245000001))
        make_face()
    revolve(axis=Axis((0, 0, -20.08), (-1, 0, 0)))

    # 阵列(圆周)2 copy 23 sketch → 阵列(圆周)2 copy 23 (revolve)
    with BuildSketch(Plane(origin=(0, 0, -20.08), x_dir=(-1, 0, 0), z_dir=(0, 0, 1))):
        with BuildLine():
            Line((0, 5.245000001), (0, 4.005))
            ThreePointArc((0, 4.005), (0.785429819, 4.389160414), (0.964365076, 5.245000001))
            Line((0.964365076, 5.245000001), (0, 5.245000001))
        make_face()
    revolve(axis=Axis((0, 0, -20.08), (0, -1, 0)))

    # 阵列(圆周)2 copy 24 sketch → 阵列(圆周)2 copy 24 (revolve)
    with BuildSketch(Plane(origin=(0, 0, -20.08), x_dir=(0, -1, 0), z_dir=(0, 0, 1))):
        with BuildLine():
            Line((0, 5.245000001), (0, 4.005))
            ThreePointArc((0, 4.005), (0.785429819, 4.389160414), (0.964365076, 5.245000001))
            Line((0.964365076, 5.245000001), (0, 5.245000001))
        make_face()
    revolve(axis=Axis((0, 0, -20.08), (1, 0, 0)))

    # 阵列(圆周)2 copy 25 sketch → 阵列(圆周)2 copy 25 (revolve)
    with BuildSketch(Plane(origin=(0, 0, -22.09), x_dir=(0, 1, 0), z_dir=(0, 0, 1))):
        with BuildLine():
            Line((0, 5.245000001), (0, 4.005))
            ThreePointArc((0, 4.005), (0.785429819, 4.389160414), (0.964365076, 5.245000001))
            Line((0.964365076, 5.245000001), (0, 5.245000001))
        make_face()
    revolve(axis=Axis((0, 0, -22.09), (-1, 0, 0)))

    # 阵列(圆周)2 copy 26 sketch → 阵列(圆周)2 copy 26 (revolve)
    with BuildSketch(Plane(origin=(0, 0, -22.09), x_dir=(-1, 0, 0), z_dir=(0, 0, 1))):
        with BuildLine():
            Line((0, 5.245000001), (0, 4.005))
            ThreePointArc((0, 4.005), (0.785429819, 4.389160414), (0.964365076, 5.245000001))
            Line((0.964365076, 5.245000001), (0, 5.245000001))
        make_face()
    revolve(axis=Axis((0, 0, -22.09), (0, -1, 0)))

    # 阵列(圆周)2 copy 27 sketch → 阵列(圆周)2 copy 27 (revolve)
    with BuildSketch(Plane(origin=(0, 0, -22.09), x_dir=(0, -1, 0), z_dir=(0, 0, 1))):
        with BuildLine():
            Line((0, 5.245000001), (0, 4.005))
            ThreePointArc((0, 4.005), (0.785429819, 4.389160414), (0.964365076, 5.245000001))
            Line((0.964365076, 5.245000001), (0, 5.245000001))
        make_face()
    revolve(axis=Axis((0, 0, -22.09), (1, 0, 0)))


solid = part.part
